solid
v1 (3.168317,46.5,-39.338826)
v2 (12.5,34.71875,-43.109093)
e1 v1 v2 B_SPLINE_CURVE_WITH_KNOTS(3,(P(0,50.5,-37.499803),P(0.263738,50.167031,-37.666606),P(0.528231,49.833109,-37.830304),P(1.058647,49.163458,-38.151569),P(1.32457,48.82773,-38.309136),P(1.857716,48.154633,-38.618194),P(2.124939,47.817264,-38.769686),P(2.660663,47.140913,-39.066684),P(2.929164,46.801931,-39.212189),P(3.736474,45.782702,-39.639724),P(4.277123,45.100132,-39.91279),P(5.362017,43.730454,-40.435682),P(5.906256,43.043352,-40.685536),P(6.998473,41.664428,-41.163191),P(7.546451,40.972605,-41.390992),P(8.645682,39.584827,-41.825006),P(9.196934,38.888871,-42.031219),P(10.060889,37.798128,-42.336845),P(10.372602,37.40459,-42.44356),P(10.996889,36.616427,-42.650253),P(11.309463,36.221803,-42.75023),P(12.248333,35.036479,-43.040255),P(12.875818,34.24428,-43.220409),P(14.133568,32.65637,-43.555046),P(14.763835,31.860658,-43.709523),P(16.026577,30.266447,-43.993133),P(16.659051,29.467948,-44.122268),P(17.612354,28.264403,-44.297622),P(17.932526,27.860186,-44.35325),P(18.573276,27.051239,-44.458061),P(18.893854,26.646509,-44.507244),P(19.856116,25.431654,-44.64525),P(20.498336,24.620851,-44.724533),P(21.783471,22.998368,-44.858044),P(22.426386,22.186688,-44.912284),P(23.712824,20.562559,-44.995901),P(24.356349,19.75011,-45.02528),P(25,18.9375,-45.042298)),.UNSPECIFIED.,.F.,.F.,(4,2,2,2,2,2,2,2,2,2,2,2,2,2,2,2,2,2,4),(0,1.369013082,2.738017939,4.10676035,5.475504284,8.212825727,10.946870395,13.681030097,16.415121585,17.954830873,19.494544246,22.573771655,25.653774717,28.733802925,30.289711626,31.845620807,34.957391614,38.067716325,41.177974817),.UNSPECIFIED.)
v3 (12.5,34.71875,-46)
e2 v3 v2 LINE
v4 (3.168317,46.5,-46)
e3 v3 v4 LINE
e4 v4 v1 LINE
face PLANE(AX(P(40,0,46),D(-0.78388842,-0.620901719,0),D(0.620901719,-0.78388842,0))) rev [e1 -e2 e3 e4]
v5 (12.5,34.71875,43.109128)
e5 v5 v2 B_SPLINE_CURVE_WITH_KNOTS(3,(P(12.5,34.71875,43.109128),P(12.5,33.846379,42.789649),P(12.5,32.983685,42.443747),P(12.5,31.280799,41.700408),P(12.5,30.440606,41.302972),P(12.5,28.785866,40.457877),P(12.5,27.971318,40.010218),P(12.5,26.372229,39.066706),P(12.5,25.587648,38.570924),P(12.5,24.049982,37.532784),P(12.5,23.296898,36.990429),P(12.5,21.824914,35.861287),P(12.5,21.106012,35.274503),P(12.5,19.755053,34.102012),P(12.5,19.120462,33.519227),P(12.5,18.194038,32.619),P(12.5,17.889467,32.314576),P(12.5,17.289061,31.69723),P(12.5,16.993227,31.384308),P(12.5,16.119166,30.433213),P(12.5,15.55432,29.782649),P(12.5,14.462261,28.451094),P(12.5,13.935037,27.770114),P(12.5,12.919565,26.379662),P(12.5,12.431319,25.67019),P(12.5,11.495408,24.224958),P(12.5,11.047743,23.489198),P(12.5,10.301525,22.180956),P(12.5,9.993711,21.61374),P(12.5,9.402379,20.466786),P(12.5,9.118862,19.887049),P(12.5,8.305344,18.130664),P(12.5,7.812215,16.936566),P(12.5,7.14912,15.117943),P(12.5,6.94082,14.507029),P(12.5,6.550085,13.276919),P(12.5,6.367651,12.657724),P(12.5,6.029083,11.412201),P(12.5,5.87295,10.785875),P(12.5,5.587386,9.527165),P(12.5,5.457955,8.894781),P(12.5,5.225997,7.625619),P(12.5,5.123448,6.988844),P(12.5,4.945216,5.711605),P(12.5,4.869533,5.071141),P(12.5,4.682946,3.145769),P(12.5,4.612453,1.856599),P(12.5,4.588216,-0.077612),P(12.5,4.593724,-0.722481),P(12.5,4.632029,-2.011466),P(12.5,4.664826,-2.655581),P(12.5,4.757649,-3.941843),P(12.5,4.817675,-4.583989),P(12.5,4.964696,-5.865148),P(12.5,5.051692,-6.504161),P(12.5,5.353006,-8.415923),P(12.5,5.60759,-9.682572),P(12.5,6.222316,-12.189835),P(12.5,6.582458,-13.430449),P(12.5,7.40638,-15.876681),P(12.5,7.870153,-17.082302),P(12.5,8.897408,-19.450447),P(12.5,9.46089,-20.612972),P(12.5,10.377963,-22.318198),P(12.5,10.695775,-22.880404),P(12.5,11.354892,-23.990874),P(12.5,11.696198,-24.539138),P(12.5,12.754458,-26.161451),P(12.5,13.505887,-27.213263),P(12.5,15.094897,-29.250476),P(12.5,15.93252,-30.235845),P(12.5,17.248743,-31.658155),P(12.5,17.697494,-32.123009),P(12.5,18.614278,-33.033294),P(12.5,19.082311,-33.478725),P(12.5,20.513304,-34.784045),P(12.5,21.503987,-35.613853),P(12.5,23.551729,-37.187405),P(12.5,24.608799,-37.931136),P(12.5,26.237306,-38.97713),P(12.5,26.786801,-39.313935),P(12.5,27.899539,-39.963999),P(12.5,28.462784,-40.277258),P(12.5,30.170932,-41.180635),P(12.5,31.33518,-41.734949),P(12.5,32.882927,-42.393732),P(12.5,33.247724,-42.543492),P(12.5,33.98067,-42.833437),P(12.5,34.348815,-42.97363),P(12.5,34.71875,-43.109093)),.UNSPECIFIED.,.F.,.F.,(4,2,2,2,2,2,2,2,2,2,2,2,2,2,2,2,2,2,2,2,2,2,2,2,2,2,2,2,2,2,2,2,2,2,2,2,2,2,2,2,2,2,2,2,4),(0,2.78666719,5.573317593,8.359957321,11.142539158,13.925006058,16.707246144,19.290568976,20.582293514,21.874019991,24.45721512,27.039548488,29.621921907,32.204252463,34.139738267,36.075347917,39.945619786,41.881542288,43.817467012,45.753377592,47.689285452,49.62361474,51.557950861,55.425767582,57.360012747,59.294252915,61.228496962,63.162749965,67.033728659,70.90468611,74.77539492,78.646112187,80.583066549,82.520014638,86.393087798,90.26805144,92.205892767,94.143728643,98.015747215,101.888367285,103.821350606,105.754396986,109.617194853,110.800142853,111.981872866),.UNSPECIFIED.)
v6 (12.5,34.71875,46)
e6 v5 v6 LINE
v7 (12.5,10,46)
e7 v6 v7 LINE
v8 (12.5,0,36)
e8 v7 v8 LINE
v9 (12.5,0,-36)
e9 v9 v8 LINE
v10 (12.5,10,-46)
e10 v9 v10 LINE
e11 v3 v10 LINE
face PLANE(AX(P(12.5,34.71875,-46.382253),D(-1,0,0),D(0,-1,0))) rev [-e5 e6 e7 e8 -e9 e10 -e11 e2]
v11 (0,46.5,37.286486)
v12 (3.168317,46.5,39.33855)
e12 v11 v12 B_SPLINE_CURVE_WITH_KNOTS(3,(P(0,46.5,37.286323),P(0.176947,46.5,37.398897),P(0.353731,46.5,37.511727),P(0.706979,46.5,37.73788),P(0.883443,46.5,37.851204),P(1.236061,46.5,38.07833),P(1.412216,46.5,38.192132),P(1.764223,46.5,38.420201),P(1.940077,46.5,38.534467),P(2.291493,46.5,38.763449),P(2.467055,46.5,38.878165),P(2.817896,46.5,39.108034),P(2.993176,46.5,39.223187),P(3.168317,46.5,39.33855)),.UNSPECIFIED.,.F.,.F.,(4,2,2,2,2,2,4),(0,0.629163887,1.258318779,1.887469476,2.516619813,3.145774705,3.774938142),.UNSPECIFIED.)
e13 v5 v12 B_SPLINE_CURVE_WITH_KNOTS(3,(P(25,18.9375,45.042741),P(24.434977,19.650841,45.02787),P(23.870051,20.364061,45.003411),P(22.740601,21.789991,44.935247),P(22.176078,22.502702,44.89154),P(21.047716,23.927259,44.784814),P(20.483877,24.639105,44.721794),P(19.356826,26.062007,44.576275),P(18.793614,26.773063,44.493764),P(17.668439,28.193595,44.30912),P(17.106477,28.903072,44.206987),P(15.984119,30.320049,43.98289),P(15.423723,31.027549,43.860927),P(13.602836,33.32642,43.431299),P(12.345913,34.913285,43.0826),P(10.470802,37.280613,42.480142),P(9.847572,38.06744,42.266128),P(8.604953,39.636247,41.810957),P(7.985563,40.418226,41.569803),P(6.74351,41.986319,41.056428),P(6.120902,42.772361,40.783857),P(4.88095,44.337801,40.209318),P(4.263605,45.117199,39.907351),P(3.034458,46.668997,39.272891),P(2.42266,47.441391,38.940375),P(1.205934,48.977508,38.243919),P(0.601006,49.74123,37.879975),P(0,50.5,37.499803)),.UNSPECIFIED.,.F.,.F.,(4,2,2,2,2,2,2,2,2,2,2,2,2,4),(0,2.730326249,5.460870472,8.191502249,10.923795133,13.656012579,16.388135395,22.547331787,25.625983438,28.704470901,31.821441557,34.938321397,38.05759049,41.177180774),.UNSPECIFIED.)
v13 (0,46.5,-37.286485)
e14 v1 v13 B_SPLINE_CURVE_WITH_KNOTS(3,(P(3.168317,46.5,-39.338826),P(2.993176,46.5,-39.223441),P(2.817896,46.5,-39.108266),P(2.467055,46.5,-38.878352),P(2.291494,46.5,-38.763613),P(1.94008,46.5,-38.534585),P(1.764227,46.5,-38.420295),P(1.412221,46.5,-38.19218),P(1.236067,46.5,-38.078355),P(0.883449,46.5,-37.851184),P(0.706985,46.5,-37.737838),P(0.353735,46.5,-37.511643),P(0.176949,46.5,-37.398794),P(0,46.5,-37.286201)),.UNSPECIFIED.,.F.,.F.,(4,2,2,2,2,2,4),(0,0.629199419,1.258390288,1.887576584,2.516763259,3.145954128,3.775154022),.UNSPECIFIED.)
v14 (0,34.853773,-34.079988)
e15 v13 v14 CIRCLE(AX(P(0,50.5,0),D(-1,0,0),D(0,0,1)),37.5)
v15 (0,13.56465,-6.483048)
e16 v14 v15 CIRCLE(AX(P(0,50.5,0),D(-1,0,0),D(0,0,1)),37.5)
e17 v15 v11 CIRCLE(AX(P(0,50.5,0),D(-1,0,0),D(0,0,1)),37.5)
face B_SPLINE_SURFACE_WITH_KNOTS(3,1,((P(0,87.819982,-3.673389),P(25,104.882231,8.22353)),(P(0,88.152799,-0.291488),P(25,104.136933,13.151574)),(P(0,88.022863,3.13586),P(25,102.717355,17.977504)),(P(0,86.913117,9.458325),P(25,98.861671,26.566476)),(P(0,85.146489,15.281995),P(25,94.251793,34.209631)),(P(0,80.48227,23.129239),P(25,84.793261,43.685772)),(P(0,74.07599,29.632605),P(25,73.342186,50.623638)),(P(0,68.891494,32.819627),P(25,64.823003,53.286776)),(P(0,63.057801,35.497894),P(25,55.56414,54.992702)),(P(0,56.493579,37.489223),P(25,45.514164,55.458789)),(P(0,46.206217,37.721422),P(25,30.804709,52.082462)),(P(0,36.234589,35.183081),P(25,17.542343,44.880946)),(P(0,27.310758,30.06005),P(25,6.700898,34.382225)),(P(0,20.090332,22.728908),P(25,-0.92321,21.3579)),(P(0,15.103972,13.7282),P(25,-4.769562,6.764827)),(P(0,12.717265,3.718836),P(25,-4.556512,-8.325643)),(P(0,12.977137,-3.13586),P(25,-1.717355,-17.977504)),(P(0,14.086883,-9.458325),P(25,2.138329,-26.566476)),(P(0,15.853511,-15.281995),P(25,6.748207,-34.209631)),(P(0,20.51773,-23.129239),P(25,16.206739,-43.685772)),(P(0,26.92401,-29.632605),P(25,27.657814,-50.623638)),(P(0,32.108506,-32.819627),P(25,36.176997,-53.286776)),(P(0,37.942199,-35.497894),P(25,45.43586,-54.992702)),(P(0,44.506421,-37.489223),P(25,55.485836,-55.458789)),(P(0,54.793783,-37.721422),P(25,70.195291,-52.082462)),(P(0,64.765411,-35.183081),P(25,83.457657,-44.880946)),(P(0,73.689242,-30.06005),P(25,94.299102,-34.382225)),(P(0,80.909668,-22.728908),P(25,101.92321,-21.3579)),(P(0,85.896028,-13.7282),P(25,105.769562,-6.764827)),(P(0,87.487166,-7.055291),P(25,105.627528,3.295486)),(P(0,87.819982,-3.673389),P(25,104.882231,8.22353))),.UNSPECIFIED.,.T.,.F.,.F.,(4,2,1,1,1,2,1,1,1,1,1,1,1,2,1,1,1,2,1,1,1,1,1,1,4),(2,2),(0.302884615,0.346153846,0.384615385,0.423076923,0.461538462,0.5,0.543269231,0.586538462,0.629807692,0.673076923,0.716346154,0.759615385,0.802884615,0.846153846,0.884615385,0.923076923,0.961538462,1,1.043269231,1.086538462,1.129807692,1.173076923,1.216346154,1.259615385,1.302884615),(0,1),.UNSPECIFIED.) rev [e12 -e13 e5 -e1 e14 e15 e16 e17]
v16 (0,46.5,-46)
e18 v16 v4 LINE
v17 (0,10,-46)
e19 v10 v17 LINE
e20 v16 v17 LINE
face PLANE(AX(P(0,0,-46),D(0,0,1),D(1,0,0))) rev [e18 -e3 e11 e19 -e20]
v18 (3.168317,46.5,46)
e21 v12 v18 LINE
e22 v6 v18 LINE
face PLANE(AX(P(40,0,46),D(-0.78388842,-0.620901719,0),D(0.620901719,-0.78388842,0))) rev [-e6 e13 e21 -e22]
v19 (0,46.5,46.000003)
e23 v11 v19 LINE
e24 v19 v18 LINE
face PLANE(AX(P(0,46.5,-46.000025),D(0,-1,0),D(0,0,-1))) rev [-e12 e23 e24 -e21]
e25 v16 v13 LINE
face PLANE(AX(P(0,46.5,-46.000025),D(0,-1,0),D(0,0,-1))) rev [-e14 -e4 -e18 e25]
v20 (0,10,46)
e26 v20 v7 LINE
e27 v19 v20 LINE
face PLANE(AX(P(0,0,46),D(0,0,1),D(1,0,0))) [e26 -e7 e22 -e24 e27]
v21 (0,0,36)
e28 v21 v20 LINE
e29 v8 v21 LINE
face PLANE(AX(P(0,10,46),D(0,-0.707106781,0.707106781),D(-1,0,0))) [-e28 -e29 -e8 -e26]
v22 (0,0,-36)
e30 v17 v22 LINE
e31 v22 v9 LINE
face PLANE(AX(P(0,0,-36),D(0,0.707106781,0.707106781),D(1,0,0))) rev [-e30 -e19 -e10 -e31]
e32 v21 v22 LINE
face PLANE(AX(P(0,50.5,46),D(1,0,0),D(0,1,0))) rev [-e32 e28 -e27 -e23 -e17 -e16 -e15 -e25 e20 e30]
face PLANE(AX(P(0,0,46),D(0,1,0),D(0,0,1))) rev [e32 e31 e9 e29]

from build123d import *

# Parameters (mm, degrees)
BOSS_EXTRUDE1_DEPTH     = 46
CUT_EXTRUDE1_DEPTH      = 113.313178374
CHAMFER1_SIZE           = 10
CUT_EXTRUDE2_DEPTH      = 106.690586293
CUT_EXTRUDE2_DEPTH_BACK = 106.690586293
SKETCH5_W               = 3.168316832
SKETCH5_H               = 4


with BuildPart() as part:
    # Sketch1 → Boss-Extrude1 (new, symmetric)
    with BuildSketch(Plane.XY):
        Polygon((0, 0), (40, 0), (0, 50.5), align=None)
    extrude(amount=BOSS_EXTRUDE1_DEPTH, both=True)

    # Cut-Loft1: read off the stored shape, not the designer's step
    # Cut-Loft1: loft between two sections, ruled curve by curve
    cut_loft1_from = [
        Edge.make_bspline([(0, 87.819982257, -3.673389342), (0, 88.152798689, -0.291487961), (0, 88.022862533, 3.13586039), (0, 86.913116995, 9.45832515), (0, 85.146489417, 15.281995192), (0, 80.482269823, 23.129239399), (0, 74.07599018, 29.632605234), (0, 68.891494438, 32.819627302), (0, 63.05780063, 35.497893971), (0, 56.493578605, 37.489222603), (0, 46.206217119, 37.721421955), (0, 36.234588822, 35.183081039), (0, 27.310758236, 30.060050466), (0, 20.090332485, 22.728908224), (0, 15.103972214, 13.728199544), (0, 12.717265155, 3.718836313), (0, 12.977137467, -3.13586039), (0, 14.086883005, -9.45832515), (0, 15.853510583, -15.281995192), (0, 20.517730177, -23.129239399), (0, 26.92400982, -29.632605234), (0, 32.108505562, -32.819627302), (0, 37.94219937, -35.497893971), (0, 44.506421395, -37.489222603), (0, 54.793782881, -37.721421955), (0, 64.765411178, -35.183081039), (0, 73.689241764, -30.060050466), (0, 80.909667515, -22.728908224), (0, 85.896027786, -13.728199544), (0, 87.487165825, -7.055290723), (0, 87.819982257, -3.673389342)], [0.302884615, 0.302884615, 0.302884615, 0.302884615, 0.346153846, 0.346153846, 0.384615385, 0.423076923, 0.461538462, 0.5, 0.5, 0.543269231, 0.586538462, 0.629807692, 0.673076923, 0.716346154, 0.759615385, 0.802884615, 0.846153846, 0.846153846, 0.884615385, 0.923076923, 0.961538462, 1, 1, 1.043269231, 1.086538462, 1.129807692, 1.173076923, 1.216346154, 1.259615385, 1.302884615, 1.302884615, 1.302884615, 1.302884615], 3),
    ]
    cut_loft1_to = [
        Edge.make_bspline([(25, 104.882230946, 8.223529932), (25, 104.136933431, 13.151573537), (25, 102.717354983, 17.977504325), (25, 98.861671081, 26.566476385), (25, 94.251793354, 34.209630574), (25, 84.793260692, 43.685771848), (25, 73.342186447, 50.623638392), (25, 64.823003498, 53.286775734), (25, 55.564139969, 54.99270233), (25, 45.514164495, 55.458788951), (25, 30.804709403, 52.082462001), (25, 17.542342514, 44.880945638), (25, 6.700897593, 34.382224999), (25, -0.923210446, 21.357900078), (25, -4.769561623, 6.764826515), (25, -4.55651188, -8.325642749), (25, -1.717354983, -17.977504325), (25, 2.138328919, -26.566476385), (25, 6.748206646, -34.209630574), (25, 16.206739308, -43.685771848), (25, 27.657813553, -50.623638392), (25, 36.176996502, -53.286775734), (25, 45.435860031, -54.99270233), (25, 55.485835505, -55.458788951), (25, 70.195290597, -52.082462001), (25, 83.457657486, -44.880945638), (25, 94.299102407, -34.382224999), (25, 101.923210446, -21.357900078), (25, 105.769561623, -6.764826515), (25, 105.627528461, 3.295486328), (25, 104.882230946, 8.223529932)], [0.302884615, 0.302884615, 0.302884615, 0.302884615, 0.346153846, 0.346153846, 0.384615385, 0.423076923, 0.461538462, 0.5, 0.5, 0.543269231, 0.586538462, 0.629807692, 0.673076923, 0.716346154, 0.759615385, 0.802884615, 0.846153846, 0.846153846, 0.884615385, 0.923076923, 0.961538462, 1, 1, 1.043269231, 1.086538462, 1.129807692, 1.173076923, 1.216346154, 1.259615385, 1.302884615, 1.302884615, 1.302884615, 1.302884615], 3),
    ]
    cut_loft1 = Solid(Shell([*[Face.make_surface_from_curves(cut_loft1_from[k], cut_loft1_to[k]) for k in range(1)], Face(Wire(cut_loft1_from)), Face(Wire(cut_loft1_to))]))
    add(cut_loft1, mode=Mode.SUBTRACT)

    # Sketch4 → Cut-Extrude1 (cut, through all)
    with BuildSketch(Plane.XY.offset(46)):
        Polygon((40, 0), (12.5, 34.71875), (12.5, 0), align=None)
    extrude(amount=-CUT_EXTRUDE1_DEPTH, mode=Mode.SUBTRACT)

    # Chamfer1
    chamfer1_edges = [part.edges().sort_by_distance(p)[0] for p in [
        (6.25, 0, -46),
        (6.25, 0, 46),
    ]]
    chamfer(chamfer1_edges, length=CHAMFER1_SIZE)

    # Sketch5 → Cut-Extrude2 (cut, two sides: drawn at the far end of the back side and taken through both)
    with BuildSketch(Plane.XY.offset(46).offset(-CUT_EXTRUDE2_DEPTH_BACK)):
        with Locations((1.584158416, 48.5)):
            Rectangle(SKETCH5_W, SKETCH5_H)
    extrude(amount=CUT_EXTRUDE2_DEPTH + CUT_EXTRUDE2_DEPTH_BACK, mode=Mode.SUBTRACT)


solid = part.part
